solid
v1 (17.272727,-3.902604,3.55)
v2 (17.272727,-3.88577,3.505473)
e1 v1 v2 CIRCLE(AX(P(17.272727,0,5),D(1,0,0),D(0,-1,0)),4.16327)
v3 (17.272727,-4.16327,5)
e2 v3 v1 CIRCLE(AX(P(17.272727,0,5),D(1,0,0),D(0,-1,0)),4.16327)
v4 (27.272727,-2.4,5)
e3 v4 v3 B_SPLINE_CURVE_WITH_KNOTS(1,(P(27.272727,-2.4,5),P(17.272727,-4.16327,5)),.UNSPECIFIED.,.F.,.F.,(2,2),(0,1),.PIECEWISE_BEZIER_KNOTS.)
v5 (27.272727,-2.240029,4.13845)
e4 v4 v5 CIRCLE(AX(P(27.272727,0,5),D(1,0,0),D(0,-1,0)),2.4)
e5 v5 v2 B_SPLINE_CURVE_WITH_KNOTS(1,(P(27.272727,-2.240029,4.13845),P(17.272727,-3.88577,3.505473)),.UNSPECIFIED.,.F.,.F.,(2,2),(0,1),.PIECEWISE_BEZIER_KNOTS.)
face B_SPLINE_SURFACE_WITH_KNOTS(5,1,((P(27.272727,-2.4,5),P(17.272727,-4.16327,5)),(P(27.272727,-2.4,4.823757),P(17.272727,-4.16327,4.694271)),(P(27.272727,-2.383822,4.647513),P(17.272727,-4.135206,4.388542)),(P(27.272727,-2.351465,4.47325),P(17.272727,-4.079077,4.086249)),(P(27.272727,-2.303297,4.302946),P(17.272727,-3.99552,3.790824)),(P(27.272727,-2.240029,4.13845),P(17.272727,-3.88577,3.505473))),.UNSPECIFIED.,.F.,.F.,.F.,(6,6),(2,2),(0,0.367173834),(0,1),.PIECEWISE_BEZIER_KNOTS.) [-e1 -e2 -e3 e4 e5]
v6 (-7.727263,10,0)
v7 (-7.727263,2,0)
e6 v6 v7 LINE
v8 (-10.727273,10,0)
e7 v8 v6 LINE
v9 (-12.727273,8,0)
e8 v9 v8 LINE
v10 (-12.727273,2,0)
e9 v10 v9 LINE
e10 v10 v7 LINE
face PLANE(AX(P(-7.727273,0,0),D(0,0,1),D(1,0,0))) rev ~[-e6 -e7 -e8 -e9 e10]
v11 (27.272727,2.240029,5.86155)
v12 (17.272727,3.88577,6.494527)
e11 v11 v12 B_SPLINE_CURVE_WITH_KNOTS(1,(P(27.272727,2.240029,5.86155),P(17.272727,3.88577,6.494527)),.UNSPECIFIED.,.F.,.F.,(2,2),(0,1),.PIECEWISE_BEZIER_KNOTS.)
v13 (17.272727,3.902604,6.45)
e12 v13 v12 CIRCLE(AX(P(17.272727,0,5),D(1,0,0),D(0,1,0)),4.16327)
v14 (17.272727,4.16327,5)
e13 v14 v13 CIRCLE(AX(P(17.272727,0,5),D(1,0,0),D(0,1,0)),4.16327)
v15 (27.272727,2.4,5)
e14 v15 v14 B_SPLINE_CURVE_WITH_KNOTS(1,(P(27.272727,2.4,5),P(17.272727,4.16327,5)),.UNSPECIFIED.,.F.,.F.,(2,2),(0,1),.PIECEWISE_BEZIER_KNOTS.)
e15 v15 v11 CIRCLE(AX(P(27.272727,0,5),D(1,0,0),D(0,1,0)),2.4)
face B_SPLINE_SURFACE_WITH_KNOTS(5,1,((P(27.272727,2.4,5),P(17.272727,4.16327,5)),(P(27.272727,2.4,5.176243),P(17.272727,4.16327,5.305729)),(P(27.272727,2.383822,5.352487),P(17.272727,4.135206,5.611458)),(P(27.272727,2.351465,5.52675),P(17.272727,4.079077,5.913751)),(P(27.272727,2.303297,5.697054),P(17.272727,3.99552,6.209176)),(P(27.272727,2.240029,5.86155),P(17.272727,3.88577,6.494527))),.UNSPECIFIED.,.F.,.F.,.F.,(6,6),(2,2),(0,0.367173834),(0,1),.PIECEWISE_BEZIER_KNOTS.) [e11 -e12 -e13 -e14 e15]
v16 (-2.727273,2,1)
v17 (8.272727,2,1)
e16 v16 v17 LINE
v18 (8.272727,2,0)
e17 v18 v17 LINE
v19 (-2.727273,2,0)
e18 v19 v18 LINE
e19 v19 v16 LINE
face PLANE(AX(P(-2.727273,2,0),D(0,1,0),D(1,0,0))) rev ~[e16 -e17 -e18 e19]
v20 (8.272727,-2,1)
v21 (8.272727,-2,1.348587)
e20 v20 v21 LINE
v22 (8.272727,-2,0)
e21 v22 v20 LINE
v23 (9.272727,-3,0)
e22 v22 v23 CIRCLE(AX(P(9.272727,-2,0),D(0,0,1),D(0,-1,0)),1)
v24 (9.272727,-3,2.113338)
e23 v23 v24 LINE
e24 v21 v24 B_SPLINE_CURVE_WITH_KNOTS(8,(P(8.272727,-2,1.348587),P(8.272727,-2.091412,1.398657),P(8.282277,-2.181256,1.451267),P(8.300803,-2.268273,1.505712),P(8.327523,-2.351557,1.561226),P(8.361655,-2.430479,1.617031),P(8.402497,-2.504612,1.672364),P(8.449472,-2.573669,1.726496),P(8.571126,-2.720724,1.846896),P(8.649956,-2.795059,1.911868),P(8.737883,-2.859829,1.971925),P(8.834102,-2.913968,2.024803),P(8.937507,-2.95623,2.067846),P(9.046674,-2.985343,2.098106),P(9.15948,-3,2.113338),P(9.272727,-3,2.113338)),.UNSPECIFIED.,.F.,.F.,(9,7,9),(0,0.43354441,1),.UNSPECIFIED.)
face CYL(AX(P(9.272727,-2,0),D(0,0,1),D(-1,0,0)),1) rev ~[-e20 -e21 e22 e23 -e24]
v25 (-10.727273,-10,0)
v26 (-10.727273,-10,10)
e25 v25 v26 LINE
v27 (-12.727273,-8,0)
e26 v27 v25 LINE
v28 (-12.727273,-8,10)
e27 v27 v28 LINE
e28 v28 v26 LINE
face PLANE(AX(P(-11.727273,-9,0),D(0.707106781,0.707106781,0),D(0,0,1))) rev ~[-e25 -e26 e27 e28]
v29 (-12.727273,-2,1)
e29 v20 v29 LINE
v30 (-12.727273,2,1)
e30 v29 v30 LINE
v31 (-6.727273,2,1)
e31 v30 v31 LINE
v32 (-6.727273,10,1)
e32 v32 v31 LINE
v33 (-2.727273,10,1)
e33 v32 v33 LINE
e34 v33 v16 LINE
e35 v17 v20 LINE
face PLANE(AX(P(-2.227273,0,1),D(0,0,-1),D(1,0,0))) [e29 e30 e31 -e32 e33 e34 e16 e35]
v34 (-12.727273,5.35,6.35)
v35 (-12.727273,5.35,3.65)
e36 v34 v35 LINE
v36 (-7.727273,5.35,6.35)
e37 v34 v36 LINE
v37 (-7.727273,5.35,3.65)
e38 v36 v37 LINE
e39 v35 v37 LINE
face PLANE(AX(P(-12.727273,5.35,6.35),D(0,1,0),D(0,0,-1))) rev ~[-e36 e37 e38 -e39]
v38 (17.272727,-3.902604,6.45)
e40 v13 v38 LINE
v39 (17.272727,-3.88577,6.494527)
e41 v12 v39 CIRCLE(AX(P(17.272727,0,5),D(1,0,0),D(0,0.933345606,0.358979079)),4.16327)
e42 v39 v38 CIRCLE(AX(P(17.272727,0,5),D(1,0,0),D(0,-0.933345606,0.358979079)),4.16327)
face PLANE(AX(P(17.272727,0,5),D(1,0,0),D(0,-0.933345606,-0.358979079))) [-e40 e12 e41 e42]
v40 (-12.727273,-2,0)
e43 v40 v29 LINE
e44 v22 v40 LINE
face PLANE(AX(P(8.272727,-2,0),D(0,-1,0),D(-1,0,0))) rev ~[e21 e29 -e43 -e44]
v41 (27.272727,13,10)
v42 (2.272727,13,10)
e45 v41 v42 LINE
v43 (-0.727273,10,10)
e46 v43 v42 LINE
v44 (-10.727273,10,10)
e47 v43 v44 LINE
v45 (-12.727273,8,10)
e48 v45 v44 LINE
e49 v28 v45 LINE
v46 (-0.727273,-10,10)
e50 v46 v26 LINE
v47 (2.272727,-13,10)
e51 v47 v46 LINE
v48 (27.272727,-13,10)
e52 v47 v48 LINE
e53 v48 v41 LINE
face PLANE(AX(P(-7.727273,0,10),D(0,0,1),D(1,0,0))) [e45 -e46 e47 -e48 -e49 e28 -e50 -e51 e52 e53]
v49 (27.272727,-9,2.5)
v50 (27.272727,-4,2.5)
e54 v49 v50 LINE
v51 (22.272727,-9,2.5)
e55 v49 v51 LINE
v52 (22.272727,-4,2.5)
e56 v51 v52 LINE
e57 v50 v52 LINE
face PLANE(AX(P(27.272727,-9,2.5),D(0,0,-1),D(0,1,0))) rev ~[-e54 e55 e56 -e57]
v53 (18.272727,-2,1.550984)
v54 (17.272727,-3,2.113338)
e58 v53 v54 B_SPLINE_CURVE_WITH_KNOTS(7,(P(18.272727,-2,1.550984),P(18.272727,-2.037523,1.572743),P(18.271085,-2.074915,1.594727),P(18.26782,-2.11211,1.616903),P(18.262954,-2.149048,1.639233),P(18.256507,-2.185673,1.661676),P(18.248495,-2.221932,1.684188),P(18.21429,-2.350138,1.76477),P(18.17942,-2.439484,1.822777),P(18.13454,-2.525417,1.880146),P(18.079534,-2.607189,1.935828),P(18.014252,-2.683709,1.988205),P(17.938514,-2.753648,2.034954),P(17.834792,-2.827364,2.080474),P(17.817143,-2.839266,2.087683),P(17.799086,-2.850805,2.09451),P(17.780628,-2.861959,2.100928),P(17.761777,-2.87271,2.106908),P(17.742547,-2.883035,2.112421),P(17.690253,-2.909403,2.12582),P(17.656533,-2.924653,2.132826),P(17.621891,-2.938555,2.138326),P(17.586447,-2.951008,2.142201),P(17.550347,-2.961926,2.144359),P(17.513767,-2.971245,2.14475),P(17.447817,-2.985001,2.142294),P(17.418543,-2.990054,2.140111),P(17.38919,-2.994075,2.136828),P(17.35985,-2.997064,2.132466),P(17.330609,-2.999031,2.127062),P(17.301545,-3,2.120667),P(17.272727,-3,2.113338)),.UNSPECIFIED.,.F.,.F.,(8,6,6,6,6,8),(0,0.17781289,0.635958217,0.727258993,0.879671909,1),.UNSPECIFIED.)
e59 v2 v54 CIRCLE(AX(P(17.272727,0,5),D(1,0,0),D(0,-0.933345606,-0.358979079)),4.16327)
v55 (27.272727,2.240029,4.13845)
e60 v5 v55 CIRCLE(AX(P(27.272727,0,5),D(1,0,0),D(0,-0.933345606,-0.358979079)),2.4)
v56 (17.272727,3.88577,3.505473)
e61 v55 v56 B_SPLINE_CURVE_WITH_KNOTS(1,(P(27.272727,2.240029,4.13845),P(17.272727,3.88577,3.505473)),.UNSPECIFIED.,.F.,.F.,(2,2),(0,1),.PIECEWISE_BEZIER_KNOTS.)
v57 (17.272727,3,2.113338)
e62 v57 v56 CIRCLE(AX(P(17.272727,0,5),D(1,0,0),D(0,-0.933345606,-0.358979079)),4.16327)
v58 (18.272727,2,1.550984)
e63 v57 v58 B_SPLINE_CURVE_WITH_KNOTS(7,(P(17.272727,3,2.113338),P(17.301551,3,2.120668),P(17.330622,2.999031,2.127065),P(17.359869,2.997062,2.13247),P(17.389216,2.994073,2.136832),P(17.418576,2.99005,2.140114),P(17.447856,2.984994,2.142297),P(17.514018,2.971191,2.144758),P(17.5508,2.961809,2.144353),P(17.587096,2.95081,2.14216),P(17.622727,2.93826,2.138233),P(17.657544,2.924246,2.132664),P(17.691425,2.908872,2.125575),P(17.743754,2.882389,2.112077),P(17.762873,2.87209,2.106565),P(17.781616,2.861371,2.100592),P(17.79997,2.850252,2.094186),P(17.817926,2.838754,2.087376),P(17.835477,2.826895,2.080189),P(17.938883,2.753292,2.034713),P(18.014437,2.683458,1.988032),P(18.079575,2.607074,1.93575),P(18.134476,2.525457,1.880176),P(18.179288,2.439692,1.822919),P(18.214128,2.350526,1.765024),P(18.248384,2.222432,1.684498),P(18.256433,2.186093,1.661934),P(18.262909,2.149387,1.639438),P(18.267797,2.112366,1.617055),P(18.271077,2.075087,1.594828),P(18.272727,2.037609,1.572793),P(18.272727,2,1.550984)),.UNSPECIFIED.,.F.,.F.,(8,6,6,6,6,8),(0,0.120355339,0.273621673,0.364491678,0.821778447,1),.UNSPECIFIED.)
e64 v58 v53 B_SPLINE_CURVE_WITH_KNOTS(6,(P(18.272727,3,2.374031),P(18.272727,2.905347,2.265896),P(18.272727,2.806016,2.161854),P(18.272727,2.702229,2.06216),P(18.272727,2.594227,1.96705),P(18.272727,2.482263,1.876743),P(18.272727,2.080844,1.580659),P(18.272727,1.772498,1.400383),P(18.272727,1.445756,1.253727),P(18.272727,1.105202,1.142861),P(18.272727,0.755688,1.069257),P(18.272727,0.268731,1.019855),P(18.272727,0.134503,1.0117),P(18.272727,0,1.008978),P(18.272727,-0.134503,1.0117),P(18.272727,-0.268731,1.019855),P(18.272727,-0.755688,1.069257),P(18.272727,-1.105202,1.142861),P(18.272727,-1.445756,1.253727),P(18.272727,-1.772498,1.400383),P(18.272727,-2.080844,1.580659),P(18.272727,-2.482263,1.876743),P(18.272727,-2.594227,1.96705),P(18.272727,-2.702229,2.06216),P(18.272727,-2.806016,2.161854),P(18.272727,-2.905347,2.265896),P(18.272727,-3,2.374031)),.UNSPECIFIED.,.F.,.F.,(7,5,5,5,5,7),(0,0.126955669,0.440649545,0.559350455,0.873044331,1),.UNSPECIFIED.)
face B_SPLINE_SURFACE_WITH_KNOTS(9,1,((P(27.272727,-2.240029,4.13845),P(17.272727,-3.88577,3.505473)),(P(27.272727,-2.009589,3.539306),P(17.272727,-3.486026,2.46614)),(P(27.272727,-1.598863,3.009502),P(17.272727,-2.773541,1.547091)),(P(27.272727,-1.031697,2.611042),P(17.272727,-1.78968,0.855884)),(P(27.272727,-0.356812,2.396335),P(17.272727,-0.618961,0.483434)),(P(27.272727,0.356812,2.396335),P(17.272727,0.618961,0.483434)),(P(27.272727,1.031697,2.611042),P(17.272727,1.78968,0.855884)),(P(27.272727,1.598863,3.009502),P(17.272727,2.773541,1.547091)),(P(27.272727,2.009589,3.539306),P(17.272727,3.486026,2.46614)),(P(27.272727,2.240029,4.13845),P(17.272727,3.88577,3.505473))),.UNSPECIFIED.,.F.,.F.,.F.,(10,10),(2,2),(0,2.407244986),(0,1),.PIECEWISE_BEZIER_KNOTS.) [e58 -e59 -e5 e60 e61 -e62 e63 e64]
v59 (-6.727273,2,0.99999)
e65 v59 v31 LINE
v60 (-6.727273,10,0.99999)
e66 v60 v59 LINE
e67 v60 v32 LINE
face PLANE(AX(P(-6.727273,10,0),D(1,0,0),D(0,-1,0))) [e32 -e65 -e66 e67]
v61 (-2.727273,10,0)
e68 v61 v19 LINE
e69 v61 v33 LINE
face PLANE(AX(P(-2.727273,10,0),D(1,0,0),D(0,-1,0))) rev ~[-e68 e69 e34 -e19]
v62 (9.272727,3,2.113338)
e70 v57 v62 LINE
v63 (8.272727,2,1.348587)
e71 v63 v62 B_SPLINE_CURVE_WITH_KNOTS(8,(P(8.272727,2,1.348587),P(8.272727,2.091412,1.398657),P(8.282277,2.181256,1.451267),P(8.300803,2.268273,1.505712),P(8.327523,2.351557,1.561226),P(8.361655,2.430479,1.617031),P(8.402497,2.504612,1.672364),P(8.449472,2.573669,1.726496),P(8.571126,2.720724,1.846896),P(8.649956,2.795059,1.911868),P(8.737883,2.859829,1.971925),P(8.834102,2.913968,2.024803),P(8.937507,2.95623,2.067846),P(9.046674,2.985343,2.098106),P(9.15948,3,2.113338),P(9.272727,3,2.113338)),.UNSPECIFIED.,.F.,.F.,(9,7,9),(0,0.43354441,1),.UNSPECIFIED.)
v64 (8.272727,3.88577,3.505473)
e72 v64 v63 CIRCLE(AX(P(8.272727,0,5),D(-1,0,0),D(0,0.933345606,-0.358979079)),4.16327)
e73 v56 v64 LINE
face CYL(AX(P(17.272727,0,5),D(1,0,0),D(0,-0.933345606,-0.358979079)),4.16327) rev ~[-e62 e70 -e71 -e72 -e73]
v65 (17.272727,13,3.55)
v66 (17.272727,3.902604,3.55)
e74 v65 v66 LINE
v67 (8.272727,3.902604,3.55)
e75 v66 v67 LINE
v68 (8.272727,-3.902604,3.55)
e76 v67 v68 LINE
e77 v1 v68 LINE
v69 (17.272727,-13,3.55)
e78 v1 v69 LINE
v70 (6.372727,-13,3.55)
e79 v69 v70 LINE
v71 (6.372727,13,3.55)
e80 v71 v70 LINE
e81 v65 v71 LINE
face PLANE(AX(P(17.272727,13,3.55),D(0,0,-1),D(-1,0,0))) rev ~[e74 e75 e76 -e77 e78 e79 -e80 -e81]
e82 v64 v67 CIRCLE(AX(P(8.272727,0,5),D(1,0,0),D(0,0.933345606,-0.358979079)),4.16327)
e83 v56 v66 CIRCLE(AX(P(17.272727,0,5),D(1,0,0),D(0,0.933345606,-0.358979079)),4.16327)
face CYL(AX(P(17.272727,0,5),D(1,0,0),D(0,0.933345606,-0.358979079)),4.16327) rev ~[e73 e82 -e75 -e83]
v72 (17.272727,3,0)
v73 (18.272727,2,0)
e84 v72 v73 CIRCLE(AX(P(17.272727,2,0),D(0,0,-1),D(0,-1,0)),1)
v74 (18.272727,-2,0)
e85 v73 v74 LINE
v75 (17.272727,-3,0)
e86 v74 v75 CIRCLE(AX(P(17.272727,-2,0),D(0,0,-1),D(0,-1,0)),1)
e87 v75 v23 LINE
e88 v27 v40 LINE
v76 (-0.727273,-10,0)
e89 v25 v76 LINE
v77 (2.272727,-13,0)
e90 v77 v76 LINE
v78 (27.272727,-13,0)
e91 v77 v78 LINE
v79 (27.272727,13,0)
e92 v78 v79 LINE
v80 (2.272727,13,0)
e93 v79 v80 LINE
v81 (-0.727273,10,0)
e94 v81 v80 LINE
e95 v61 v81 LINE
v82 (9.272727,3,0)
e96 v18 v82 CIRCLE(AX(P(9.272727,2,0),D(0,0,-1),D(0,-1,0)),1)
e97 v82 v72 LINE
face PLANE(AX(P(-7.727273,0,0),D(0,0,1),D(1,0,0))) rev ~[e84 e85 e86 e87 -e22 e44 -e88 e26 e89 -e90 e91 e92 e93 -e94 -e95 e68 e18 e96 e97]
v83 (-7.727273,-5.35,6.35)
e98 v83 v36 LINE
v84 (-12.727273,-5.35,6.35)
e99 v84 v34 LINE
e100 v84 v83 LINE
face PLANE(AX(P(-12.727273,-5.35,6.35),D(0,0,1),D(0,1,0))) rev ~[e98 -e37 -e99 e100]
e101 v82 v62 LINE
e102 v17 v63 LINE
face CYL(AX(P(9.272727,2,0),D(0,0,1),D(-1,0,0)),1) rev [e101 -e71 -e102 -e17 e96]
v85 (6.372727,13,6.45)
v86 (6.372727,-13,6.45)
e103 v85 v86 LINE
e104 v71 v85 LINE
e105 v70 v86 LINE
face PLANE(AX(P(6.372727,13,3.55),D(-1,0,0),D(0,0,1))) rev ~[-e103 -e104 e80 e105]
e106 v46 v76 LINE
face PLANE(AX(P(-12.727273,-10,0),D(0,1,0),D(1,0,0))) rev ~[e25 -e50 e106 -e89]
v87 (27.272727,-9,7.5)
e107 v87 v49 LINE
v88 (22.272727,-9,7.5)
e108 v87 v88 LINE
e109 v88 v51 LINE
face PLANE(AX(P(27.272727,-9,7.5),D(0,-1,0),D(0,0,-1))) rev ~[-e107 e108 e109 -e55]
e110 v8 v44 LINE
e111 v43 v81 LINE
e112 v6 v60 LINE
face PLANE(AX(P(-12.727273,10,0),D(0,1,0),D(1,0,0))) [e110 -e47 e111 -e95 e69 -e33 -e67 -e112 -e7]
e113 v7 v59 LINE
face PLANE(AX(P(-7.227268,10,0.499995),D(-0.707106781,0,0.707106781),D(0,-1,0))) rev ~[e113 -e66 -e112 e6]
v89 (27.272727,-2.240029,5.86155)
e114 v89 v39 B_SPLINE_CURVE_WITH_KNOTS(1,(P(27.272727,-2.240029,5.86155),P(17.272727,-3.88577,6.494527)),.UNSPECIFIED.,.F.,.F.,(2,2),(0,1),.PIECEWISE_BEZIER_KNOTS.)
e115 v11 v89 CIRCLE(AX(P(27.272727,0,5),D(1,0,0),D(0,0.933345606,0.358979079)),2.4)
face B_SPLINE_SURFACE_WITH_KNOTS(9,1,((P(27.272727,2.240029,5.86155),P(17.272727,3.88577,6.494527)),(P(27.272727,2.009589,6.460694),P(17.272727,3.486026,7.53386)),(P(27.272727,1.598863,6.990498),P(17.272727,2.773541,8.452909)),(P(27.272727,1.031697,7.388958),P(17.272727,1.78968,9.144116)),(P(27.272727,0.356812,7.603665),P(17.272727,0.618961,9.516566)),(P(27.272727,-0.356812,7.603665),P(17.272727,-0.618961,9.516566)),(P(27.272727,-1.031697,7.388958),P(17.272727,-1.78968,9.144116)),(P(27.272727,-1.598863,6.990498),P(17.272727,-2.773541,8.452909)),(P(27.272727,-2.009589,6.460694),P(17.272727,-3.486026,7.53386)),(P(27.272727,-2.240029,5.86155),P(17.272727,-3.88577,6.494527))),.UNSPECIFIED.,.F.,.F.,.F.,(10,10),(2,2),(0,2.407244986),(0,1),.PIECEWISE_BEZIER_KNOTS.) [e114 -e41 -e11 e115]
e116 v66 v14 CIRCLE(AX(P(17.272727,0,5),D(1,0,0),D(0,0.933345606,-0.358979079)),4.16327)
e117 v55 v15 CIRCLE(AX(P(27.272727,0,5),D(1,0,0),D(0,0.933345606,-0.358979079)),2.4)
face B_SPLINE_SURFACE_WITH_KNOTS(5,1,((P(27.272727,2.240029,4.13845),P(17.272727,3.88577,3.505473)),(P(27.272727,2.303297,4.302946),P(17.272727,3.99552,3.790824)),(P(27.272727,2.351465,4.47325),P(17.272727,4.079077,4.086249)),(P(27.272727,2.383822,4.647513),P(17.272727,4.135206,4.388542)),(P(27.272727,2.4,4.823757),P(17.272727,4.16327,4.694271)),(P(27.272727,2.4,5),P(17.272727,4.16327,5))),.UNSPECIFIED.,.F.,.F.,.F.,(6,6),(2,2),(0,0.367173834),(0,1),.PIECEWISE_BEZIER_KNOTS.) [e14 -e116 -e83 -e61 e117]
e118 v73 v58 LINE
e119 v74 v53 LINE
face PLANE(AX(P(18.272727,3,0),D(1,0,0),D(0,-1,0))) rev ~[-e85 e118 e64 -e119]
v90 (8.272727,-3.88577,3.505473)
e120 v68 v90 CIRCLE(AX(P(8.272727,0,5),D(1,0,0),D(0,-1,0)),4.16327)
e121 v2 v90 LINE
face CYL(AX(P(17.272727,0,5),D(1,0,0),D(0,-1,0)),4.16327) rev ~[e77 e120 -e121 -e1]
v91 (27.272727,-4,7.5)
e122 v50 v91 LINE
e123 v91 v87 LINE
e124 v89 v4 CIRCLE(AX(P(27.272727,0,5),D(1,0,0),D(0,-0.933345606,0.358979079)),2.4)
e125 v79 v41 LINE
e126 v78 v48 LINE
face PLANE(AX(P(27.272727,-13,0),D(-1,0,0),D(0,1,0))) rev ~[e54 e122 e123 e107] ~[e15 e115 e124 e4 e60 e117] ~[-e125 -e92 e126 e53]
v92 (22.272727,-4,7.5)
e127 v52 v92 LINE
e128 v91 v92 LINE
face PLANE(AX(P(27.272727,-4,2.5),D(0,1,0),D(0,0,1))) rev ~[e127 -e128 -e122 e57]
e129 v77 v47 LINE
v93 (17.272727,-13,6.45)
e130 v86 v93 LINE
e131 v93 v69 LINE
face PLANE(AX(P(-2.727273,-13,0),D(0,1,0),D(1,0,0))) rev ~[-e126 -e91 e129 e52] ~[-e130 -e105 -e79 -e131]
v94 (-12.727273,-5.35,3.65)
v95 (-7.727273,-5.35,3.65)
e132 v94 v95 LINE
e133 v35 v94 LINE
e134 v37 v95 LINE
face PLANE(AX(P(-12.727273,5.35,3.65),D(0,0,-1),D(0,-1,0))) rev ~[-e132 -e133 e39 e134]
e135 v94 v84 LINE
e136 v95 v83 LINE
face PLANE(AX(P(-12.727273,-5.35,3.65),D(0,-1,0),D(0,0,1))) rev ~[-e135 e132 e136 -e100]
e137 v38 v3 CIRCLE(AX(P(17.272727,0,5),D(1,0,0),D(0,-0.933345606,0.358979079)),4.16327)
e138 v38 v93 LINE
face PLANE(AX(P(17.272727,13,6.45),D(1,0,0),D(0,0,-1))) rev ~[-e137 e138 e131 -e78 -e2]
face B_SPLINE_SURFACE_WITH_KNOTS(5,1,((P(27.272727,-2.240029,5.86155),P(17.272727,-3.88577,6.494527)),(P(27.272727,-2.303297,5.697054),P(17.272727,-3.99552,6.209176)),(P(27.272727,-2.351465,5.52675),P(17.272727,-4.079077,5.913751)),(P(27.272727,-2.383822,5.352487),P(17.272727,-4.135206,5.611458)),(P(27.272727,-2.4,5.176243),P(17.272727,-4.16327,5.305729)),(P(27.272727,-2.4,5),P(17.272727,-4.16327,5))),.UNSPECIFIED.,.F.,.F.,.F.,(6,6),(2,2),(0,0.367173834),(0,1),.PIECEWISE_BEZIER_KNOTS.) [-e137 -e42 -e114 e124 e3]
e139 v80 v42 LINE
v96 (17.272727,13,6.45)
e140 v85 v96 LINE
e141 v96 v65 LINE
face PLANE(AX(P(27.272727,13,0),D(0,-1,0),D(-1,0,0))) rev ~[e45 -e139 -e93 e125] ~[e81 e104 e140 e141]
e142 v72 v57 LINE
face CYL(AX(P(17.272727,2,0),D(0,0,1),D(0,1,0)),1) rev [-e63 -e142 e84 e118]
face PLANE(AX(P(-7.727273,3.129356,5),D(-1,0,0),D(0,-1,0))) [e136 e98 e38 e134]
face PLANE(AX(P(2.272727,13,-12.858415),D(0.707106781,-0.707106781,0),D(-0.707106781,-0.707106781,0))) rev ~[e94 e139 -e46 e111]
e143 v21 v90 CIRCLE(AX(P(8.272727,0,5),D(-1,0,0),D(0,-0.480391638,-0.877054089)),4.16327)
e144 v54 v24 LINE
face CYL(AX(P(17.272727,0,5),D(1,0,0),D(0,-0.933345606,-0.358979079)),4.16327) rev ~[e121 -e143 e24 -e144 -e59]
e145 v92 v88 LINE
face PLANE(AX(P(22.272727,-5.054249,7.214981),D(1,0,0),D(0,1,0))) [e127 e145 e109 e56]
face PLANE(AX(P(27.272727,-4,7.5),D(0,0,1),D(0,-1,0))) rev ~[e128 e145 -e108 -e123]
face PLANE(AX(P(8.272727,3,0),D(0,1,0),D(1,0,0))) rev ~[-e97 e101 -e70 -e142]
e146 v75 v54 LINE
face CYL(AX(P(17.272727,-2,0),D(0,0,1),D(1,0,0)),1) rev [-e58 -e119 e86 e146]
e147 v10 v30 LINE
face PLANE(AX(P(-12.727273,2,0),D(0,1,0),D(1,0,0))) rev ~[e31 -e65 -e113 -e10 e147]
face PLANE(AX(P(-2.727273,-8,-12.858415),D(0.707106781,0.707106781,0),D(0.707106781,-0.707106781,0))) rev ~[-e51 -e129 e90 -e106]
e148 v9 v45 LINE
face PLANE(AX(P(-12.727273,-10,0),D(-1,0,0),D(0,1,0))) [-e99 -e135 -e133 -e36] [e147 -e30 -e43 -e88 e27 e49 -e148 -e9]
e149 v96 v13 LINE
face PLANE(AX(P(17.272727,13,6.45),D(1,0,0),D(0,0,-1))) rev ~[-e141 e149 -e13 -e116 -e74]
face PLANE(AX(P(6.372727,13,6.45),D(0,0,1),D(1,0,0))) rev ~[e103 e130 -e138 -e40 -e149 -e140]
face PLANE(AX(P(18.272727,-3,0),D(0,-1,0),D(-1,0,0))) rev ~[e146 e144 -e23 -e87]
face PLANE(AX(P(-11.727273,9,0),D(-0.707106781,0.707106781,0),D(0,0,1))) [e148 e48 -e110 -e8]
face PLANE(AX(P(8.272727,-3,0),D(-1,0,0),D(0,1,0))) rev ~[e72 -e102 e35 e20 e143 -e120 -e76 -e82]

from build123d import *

# Parameters (mm, degrees)
F0_W        = 10
F0_H        = 20
F1_DEPTH    = 10
F3_DEPTH    = 5
F4_T4_DEPTH = 35.7168298797
F4_T9_DEPTH = 35.7168298797
F5_SIZE     = 2
F7_DEPTH    = 26
F9_DEPTH    = 10
F9_TAPER    = -10
F11_DEPTH   = 5
F12_DEPTH   = 9
F13_R       = 1
F14_W       = 4
F14_H       = 8
F15_DEPTH   = 1
F16_SIZE    = 0.99999
F17_DEPTH   = 5


# Not quite as in the source:
# - a fillet or chamfer that OpenCascade refuses, or shapes differently, is made with other operations: its cross-section is extruded or revolved along the edge and cut away or added
# - a fillet or chamfer is up to 0.001 mm smaller than in the source, because OpenCascade refuses the exact size
# - a feature names something its author has since deleted; it is built from what else it names


with BuildPart() as f1:
    # F0 (on Top) → F1 (new body)
    with BuildSketch(Plane.XY):
        with Locations((-7.7272727273, 0)):
            Rectangle(F0_W, F0_H)
        Polygon((-2.7272727273, 13), (-2.7272727273, 10), (-2.7272727273, -10), (-2.7272727273, -13), (27.2727272727, -13), (27.2727272727, 13), align=None)
    extrude(amount=F1_DEPTH)

    # F2 (on face) → F3 (cut)
    with BuildSketch(Plane(origin=(-12.7272727273, 0, 0), x_dir=(0, -1, 0), z_dir=(-1, 0, 0))):
        Polygon((0, 5), (-2.7, 6.35), (-5.35, 6.35), (-5.35, 3.65), (-2.7, 3.65), align=None)
        Polygon((2.7, 3.65), (0, 5), (-2.7, 3.65), align=None)
        Polygon((2.7, 6.35), (0, 5), (2.7, 3.65), (5.35, 3.65), (5.35, 6.35), align=None)
        Polygon((2.7, 6.35), (-2.7, 6.35), (0, 5), align=None)
    extrude(amount=-F3_DEPTH, mode=Mode.SUBTRACT)

    # F4: chamfer of 5 on 2 edges, made by hand


with BuildPart() as f4_tool2:
    # F4_s3 → F4_t4 (new body)
    with BuildSketch(Plane.XY.offset(-12.8584149398)):
        Polygon((2.2727272727, 13), (-2.7272727273, 8), (-2.7272727273, 13), align=None)
    extrude(amount=F4_T4_DEPTH)

    split(bisect_by=Plane.XZ.offset(-10), keep=Keep.BOTTOM)


with BuildPart() as f1_1:
    add(f1.part)

    # F4_t1: cut F4_tool2
    add(f4_tool2.part, mode=Mode.SUBTRACT)


with BuildPart() as f4_tool7:
    # F4_s8 → F4_t9 (new body)
    with BuildSketch(Plane.XY.offset(-12.8584149398)):
        Polygon((-2.7272727273, -8), (2.2727272727, -13), (-2.7272727273, -13), align=None)
    extrude(amount=F4_T9_DEPTH)

    split(bisect_by=Plane.XZ.offset(10), keep=Keep.TOP)


with BuildPart() as f1_2:
    add(f1_1.part)

    # F4_t6: cut F4_tool7
    add(f4_tool7.part, mode=Mode.SUBTRACT)

    # F5
    f5_edges = [f1_2.edges().sort_by_distance(p)[0] for p in [
        (-12.727273, 10, 5),
        (-12.727273, -10, 5),
    ]]
    chamfer(f5_edges, length=F5_SIZE)

    # F6 (on face) → F7 (cut, through all)
    with BuildSketch(Plane(origin=(0, 13, 0), x_dir=(-1, 0, 0), z_dir=(0, 1, 0))):
        Polygon((-14.7727272727, 5), (-17.2727272727, 6), (-17.2727272727, 5), align=None)
        Polygon((-17.2727272727, 6.45), (-17.2727272727, 6), (-14.7727272727, 5), (-11.1477272727, 6.45), align=None)
        Polygon((-11.1477272727, 6.45), (-14.7727272727, 5), (-6.3727272727, 5), (-6.3727272727, 6.45), align=None)
        Polygon((-17.2727272727, 4), (-14.7727272727, 5), (-17.2727272727, 5), align=None)
        Polygon((-11.1477272727, 3.55), (-14.7727272727, 5), (-17.2727272727, 4), (-17.2727272727, 3.55), align=None)
        Polygon((-6.3727272727, 5), (-14.7727272727, 5), (-11.1477272727, 3.55), (-6.3727272727, 3.55), align=None)
    extrude(amount=-F7_DEPTH, mode=Mode.SUBTRACT)

    # F8 (on face) → F9 (cut, through all)
    with BuildSketch(Plane.YZ.offset(27.2727272727)):
        with BuildLine():
            Line((-2.4, 5), (0, 5))
            Line((0, 5), (-2.2400294549, 5.8615497903))
            ThreePointArc((-2.2400294549, 5.8615497903), (-2.3596684822, 5.4381377114), (-2.4, 5))
        make_face()
        with BuildLine():
            Line((-2.2400294549, 5.8615497903), (0, 5))
            Line((0, 5), (2.2400294549, 5.8615497903))
            ThreePointArc((2.2400294549, 5.8615497903), (0, 7.4), (-2.2400294549, 5.8615497903))
        make_face()
        with BuildLine():
            Line((0, 5), (2.2400294549, 4.1384502097))
            ThreePointArc((2.2400294549, 4.1384502097), (2.3596684822, 4.5618622886), (2.4, 5))
            ThreePointArc((2.4, 5), (2.3596684822, 5.4381377114), (2.2400294549, 5.8615497903))
            Line((2.2400294549, 5.8615497903), (0, 5))
        make_face()
        with BuildLine():
            ThreePointArc((-2.2400294549, 4.1384502097), (0, 2.6), (2.2400294549, 4.1384502097))
            Line((2.2400294549, 4.1384502097), (0, 5))
            Line((0, 5), (-2.2400294549, 4.1384502097))
        make_face()
        with BuildLine():
            Line((-2.2400294549, 4.1384502097), (0, 5))
            Line((0, 5), (-2.4, 5))
            ThreePointArc((-2.4, 5), (-2.3596684822, 4.5618622886), (-2.2400294549, 4.1384502097))
        make_face()
    extrude(amount=-F9_DEPTH, taper=F9_TAPER, mode=Mode.SUBTRACT)

    # F10 (on face) → F11 (cut)
    with BuildSketch(Plane(origin=(0, 0, 0), x_dir=(1, 0, 0), z_dir=(0, 0, -1))):
        Polygon((18.2727272727, -3), (18.2727272727, 3), (16.2727272727, 3), (8.2727272727, 3), (8.2727272727, -3), (16.2727272727, -3), align=None)
    extrude(amount=-F11_DEPTH, mode=Mode.SUBTRACT)

    # F12 (cut, through all): faces of the model
    f12_faces = [f1_2.faces().sort_by_distance(p)[0] for p in [
        (17.2727272727, 3.3247194786, 3.0369278497),
        (17.2727272727, -3.3247194786, 3.0369278497),
    ]]
    extrude(f12_faces, amount=-F12_DEPTH, mode=Mode.SUBTRACT)

    # F13
    f13_edges = [f1_2.edges().sort_by_distance(p)[0] for p in [
        (18.272727, -3, 1.187016),
        (8.272727, -3, 1.056669),
        (8.272727, 3, 1.056669),
        (18.272727, 3, 1.187016),
    ]]
    fillet(f13_edges, radius=F13_R)

    # F14 (on face) → F15 (cut)
    with BuildSketch(Plane(origin=(0, 0, 0), x_dir=(1, 0, 0), z_dir=(0, 0, -1))):
        Polygon((8.2727272727, 2), (-12.7272727273, 2), (-12.7272727273, -2), (-6.7272727273, -2), (-2.7272727273, -2), (8.2727272727, -2), align=None)
        with Locations((-4.7272727273, -6)):
            Rectangle(F14_W, F14_H)
    extrude(amount=-F15_DEPTH, mode=Mode.SUBTRACT)

    # F16 (size 1 in the source; OpenCascade refuses exactly that, so slightly less here)
    f16_edges = [f1_2.edges().sort_by_distance(p)[0] for p in [
        (-6.727273, 6, 0),
    ]]
    chamfer(f16_edges, length=F16_SIZE)

    # F8 (on face) → F17 (cut)
    with BuildSketch(Plane.YZ.offset(27.2727272727)):
        Polygon((-4, 7.5), (-6.5, 7.5), (-4, 6.5384615385), align=None)
        Polygon((-4, 6.5384615385), (-6.5, 7.5), (-9, 7.5), (-9, 5), (-4, 5), align=None)
        Polygon((-9, 2.5), (-6.5, 2.5), (-4, 3.4615384615), (-4, 5), (-9, 5), align=None)
        Polygon((-4, 3.4615384615), (-6.5, 2.5), (-4, 2.5), align=None)
    extrude(amount=-F17_DEPTH, mode=Mode.SUBTRACT)


solid = f1_2.part
